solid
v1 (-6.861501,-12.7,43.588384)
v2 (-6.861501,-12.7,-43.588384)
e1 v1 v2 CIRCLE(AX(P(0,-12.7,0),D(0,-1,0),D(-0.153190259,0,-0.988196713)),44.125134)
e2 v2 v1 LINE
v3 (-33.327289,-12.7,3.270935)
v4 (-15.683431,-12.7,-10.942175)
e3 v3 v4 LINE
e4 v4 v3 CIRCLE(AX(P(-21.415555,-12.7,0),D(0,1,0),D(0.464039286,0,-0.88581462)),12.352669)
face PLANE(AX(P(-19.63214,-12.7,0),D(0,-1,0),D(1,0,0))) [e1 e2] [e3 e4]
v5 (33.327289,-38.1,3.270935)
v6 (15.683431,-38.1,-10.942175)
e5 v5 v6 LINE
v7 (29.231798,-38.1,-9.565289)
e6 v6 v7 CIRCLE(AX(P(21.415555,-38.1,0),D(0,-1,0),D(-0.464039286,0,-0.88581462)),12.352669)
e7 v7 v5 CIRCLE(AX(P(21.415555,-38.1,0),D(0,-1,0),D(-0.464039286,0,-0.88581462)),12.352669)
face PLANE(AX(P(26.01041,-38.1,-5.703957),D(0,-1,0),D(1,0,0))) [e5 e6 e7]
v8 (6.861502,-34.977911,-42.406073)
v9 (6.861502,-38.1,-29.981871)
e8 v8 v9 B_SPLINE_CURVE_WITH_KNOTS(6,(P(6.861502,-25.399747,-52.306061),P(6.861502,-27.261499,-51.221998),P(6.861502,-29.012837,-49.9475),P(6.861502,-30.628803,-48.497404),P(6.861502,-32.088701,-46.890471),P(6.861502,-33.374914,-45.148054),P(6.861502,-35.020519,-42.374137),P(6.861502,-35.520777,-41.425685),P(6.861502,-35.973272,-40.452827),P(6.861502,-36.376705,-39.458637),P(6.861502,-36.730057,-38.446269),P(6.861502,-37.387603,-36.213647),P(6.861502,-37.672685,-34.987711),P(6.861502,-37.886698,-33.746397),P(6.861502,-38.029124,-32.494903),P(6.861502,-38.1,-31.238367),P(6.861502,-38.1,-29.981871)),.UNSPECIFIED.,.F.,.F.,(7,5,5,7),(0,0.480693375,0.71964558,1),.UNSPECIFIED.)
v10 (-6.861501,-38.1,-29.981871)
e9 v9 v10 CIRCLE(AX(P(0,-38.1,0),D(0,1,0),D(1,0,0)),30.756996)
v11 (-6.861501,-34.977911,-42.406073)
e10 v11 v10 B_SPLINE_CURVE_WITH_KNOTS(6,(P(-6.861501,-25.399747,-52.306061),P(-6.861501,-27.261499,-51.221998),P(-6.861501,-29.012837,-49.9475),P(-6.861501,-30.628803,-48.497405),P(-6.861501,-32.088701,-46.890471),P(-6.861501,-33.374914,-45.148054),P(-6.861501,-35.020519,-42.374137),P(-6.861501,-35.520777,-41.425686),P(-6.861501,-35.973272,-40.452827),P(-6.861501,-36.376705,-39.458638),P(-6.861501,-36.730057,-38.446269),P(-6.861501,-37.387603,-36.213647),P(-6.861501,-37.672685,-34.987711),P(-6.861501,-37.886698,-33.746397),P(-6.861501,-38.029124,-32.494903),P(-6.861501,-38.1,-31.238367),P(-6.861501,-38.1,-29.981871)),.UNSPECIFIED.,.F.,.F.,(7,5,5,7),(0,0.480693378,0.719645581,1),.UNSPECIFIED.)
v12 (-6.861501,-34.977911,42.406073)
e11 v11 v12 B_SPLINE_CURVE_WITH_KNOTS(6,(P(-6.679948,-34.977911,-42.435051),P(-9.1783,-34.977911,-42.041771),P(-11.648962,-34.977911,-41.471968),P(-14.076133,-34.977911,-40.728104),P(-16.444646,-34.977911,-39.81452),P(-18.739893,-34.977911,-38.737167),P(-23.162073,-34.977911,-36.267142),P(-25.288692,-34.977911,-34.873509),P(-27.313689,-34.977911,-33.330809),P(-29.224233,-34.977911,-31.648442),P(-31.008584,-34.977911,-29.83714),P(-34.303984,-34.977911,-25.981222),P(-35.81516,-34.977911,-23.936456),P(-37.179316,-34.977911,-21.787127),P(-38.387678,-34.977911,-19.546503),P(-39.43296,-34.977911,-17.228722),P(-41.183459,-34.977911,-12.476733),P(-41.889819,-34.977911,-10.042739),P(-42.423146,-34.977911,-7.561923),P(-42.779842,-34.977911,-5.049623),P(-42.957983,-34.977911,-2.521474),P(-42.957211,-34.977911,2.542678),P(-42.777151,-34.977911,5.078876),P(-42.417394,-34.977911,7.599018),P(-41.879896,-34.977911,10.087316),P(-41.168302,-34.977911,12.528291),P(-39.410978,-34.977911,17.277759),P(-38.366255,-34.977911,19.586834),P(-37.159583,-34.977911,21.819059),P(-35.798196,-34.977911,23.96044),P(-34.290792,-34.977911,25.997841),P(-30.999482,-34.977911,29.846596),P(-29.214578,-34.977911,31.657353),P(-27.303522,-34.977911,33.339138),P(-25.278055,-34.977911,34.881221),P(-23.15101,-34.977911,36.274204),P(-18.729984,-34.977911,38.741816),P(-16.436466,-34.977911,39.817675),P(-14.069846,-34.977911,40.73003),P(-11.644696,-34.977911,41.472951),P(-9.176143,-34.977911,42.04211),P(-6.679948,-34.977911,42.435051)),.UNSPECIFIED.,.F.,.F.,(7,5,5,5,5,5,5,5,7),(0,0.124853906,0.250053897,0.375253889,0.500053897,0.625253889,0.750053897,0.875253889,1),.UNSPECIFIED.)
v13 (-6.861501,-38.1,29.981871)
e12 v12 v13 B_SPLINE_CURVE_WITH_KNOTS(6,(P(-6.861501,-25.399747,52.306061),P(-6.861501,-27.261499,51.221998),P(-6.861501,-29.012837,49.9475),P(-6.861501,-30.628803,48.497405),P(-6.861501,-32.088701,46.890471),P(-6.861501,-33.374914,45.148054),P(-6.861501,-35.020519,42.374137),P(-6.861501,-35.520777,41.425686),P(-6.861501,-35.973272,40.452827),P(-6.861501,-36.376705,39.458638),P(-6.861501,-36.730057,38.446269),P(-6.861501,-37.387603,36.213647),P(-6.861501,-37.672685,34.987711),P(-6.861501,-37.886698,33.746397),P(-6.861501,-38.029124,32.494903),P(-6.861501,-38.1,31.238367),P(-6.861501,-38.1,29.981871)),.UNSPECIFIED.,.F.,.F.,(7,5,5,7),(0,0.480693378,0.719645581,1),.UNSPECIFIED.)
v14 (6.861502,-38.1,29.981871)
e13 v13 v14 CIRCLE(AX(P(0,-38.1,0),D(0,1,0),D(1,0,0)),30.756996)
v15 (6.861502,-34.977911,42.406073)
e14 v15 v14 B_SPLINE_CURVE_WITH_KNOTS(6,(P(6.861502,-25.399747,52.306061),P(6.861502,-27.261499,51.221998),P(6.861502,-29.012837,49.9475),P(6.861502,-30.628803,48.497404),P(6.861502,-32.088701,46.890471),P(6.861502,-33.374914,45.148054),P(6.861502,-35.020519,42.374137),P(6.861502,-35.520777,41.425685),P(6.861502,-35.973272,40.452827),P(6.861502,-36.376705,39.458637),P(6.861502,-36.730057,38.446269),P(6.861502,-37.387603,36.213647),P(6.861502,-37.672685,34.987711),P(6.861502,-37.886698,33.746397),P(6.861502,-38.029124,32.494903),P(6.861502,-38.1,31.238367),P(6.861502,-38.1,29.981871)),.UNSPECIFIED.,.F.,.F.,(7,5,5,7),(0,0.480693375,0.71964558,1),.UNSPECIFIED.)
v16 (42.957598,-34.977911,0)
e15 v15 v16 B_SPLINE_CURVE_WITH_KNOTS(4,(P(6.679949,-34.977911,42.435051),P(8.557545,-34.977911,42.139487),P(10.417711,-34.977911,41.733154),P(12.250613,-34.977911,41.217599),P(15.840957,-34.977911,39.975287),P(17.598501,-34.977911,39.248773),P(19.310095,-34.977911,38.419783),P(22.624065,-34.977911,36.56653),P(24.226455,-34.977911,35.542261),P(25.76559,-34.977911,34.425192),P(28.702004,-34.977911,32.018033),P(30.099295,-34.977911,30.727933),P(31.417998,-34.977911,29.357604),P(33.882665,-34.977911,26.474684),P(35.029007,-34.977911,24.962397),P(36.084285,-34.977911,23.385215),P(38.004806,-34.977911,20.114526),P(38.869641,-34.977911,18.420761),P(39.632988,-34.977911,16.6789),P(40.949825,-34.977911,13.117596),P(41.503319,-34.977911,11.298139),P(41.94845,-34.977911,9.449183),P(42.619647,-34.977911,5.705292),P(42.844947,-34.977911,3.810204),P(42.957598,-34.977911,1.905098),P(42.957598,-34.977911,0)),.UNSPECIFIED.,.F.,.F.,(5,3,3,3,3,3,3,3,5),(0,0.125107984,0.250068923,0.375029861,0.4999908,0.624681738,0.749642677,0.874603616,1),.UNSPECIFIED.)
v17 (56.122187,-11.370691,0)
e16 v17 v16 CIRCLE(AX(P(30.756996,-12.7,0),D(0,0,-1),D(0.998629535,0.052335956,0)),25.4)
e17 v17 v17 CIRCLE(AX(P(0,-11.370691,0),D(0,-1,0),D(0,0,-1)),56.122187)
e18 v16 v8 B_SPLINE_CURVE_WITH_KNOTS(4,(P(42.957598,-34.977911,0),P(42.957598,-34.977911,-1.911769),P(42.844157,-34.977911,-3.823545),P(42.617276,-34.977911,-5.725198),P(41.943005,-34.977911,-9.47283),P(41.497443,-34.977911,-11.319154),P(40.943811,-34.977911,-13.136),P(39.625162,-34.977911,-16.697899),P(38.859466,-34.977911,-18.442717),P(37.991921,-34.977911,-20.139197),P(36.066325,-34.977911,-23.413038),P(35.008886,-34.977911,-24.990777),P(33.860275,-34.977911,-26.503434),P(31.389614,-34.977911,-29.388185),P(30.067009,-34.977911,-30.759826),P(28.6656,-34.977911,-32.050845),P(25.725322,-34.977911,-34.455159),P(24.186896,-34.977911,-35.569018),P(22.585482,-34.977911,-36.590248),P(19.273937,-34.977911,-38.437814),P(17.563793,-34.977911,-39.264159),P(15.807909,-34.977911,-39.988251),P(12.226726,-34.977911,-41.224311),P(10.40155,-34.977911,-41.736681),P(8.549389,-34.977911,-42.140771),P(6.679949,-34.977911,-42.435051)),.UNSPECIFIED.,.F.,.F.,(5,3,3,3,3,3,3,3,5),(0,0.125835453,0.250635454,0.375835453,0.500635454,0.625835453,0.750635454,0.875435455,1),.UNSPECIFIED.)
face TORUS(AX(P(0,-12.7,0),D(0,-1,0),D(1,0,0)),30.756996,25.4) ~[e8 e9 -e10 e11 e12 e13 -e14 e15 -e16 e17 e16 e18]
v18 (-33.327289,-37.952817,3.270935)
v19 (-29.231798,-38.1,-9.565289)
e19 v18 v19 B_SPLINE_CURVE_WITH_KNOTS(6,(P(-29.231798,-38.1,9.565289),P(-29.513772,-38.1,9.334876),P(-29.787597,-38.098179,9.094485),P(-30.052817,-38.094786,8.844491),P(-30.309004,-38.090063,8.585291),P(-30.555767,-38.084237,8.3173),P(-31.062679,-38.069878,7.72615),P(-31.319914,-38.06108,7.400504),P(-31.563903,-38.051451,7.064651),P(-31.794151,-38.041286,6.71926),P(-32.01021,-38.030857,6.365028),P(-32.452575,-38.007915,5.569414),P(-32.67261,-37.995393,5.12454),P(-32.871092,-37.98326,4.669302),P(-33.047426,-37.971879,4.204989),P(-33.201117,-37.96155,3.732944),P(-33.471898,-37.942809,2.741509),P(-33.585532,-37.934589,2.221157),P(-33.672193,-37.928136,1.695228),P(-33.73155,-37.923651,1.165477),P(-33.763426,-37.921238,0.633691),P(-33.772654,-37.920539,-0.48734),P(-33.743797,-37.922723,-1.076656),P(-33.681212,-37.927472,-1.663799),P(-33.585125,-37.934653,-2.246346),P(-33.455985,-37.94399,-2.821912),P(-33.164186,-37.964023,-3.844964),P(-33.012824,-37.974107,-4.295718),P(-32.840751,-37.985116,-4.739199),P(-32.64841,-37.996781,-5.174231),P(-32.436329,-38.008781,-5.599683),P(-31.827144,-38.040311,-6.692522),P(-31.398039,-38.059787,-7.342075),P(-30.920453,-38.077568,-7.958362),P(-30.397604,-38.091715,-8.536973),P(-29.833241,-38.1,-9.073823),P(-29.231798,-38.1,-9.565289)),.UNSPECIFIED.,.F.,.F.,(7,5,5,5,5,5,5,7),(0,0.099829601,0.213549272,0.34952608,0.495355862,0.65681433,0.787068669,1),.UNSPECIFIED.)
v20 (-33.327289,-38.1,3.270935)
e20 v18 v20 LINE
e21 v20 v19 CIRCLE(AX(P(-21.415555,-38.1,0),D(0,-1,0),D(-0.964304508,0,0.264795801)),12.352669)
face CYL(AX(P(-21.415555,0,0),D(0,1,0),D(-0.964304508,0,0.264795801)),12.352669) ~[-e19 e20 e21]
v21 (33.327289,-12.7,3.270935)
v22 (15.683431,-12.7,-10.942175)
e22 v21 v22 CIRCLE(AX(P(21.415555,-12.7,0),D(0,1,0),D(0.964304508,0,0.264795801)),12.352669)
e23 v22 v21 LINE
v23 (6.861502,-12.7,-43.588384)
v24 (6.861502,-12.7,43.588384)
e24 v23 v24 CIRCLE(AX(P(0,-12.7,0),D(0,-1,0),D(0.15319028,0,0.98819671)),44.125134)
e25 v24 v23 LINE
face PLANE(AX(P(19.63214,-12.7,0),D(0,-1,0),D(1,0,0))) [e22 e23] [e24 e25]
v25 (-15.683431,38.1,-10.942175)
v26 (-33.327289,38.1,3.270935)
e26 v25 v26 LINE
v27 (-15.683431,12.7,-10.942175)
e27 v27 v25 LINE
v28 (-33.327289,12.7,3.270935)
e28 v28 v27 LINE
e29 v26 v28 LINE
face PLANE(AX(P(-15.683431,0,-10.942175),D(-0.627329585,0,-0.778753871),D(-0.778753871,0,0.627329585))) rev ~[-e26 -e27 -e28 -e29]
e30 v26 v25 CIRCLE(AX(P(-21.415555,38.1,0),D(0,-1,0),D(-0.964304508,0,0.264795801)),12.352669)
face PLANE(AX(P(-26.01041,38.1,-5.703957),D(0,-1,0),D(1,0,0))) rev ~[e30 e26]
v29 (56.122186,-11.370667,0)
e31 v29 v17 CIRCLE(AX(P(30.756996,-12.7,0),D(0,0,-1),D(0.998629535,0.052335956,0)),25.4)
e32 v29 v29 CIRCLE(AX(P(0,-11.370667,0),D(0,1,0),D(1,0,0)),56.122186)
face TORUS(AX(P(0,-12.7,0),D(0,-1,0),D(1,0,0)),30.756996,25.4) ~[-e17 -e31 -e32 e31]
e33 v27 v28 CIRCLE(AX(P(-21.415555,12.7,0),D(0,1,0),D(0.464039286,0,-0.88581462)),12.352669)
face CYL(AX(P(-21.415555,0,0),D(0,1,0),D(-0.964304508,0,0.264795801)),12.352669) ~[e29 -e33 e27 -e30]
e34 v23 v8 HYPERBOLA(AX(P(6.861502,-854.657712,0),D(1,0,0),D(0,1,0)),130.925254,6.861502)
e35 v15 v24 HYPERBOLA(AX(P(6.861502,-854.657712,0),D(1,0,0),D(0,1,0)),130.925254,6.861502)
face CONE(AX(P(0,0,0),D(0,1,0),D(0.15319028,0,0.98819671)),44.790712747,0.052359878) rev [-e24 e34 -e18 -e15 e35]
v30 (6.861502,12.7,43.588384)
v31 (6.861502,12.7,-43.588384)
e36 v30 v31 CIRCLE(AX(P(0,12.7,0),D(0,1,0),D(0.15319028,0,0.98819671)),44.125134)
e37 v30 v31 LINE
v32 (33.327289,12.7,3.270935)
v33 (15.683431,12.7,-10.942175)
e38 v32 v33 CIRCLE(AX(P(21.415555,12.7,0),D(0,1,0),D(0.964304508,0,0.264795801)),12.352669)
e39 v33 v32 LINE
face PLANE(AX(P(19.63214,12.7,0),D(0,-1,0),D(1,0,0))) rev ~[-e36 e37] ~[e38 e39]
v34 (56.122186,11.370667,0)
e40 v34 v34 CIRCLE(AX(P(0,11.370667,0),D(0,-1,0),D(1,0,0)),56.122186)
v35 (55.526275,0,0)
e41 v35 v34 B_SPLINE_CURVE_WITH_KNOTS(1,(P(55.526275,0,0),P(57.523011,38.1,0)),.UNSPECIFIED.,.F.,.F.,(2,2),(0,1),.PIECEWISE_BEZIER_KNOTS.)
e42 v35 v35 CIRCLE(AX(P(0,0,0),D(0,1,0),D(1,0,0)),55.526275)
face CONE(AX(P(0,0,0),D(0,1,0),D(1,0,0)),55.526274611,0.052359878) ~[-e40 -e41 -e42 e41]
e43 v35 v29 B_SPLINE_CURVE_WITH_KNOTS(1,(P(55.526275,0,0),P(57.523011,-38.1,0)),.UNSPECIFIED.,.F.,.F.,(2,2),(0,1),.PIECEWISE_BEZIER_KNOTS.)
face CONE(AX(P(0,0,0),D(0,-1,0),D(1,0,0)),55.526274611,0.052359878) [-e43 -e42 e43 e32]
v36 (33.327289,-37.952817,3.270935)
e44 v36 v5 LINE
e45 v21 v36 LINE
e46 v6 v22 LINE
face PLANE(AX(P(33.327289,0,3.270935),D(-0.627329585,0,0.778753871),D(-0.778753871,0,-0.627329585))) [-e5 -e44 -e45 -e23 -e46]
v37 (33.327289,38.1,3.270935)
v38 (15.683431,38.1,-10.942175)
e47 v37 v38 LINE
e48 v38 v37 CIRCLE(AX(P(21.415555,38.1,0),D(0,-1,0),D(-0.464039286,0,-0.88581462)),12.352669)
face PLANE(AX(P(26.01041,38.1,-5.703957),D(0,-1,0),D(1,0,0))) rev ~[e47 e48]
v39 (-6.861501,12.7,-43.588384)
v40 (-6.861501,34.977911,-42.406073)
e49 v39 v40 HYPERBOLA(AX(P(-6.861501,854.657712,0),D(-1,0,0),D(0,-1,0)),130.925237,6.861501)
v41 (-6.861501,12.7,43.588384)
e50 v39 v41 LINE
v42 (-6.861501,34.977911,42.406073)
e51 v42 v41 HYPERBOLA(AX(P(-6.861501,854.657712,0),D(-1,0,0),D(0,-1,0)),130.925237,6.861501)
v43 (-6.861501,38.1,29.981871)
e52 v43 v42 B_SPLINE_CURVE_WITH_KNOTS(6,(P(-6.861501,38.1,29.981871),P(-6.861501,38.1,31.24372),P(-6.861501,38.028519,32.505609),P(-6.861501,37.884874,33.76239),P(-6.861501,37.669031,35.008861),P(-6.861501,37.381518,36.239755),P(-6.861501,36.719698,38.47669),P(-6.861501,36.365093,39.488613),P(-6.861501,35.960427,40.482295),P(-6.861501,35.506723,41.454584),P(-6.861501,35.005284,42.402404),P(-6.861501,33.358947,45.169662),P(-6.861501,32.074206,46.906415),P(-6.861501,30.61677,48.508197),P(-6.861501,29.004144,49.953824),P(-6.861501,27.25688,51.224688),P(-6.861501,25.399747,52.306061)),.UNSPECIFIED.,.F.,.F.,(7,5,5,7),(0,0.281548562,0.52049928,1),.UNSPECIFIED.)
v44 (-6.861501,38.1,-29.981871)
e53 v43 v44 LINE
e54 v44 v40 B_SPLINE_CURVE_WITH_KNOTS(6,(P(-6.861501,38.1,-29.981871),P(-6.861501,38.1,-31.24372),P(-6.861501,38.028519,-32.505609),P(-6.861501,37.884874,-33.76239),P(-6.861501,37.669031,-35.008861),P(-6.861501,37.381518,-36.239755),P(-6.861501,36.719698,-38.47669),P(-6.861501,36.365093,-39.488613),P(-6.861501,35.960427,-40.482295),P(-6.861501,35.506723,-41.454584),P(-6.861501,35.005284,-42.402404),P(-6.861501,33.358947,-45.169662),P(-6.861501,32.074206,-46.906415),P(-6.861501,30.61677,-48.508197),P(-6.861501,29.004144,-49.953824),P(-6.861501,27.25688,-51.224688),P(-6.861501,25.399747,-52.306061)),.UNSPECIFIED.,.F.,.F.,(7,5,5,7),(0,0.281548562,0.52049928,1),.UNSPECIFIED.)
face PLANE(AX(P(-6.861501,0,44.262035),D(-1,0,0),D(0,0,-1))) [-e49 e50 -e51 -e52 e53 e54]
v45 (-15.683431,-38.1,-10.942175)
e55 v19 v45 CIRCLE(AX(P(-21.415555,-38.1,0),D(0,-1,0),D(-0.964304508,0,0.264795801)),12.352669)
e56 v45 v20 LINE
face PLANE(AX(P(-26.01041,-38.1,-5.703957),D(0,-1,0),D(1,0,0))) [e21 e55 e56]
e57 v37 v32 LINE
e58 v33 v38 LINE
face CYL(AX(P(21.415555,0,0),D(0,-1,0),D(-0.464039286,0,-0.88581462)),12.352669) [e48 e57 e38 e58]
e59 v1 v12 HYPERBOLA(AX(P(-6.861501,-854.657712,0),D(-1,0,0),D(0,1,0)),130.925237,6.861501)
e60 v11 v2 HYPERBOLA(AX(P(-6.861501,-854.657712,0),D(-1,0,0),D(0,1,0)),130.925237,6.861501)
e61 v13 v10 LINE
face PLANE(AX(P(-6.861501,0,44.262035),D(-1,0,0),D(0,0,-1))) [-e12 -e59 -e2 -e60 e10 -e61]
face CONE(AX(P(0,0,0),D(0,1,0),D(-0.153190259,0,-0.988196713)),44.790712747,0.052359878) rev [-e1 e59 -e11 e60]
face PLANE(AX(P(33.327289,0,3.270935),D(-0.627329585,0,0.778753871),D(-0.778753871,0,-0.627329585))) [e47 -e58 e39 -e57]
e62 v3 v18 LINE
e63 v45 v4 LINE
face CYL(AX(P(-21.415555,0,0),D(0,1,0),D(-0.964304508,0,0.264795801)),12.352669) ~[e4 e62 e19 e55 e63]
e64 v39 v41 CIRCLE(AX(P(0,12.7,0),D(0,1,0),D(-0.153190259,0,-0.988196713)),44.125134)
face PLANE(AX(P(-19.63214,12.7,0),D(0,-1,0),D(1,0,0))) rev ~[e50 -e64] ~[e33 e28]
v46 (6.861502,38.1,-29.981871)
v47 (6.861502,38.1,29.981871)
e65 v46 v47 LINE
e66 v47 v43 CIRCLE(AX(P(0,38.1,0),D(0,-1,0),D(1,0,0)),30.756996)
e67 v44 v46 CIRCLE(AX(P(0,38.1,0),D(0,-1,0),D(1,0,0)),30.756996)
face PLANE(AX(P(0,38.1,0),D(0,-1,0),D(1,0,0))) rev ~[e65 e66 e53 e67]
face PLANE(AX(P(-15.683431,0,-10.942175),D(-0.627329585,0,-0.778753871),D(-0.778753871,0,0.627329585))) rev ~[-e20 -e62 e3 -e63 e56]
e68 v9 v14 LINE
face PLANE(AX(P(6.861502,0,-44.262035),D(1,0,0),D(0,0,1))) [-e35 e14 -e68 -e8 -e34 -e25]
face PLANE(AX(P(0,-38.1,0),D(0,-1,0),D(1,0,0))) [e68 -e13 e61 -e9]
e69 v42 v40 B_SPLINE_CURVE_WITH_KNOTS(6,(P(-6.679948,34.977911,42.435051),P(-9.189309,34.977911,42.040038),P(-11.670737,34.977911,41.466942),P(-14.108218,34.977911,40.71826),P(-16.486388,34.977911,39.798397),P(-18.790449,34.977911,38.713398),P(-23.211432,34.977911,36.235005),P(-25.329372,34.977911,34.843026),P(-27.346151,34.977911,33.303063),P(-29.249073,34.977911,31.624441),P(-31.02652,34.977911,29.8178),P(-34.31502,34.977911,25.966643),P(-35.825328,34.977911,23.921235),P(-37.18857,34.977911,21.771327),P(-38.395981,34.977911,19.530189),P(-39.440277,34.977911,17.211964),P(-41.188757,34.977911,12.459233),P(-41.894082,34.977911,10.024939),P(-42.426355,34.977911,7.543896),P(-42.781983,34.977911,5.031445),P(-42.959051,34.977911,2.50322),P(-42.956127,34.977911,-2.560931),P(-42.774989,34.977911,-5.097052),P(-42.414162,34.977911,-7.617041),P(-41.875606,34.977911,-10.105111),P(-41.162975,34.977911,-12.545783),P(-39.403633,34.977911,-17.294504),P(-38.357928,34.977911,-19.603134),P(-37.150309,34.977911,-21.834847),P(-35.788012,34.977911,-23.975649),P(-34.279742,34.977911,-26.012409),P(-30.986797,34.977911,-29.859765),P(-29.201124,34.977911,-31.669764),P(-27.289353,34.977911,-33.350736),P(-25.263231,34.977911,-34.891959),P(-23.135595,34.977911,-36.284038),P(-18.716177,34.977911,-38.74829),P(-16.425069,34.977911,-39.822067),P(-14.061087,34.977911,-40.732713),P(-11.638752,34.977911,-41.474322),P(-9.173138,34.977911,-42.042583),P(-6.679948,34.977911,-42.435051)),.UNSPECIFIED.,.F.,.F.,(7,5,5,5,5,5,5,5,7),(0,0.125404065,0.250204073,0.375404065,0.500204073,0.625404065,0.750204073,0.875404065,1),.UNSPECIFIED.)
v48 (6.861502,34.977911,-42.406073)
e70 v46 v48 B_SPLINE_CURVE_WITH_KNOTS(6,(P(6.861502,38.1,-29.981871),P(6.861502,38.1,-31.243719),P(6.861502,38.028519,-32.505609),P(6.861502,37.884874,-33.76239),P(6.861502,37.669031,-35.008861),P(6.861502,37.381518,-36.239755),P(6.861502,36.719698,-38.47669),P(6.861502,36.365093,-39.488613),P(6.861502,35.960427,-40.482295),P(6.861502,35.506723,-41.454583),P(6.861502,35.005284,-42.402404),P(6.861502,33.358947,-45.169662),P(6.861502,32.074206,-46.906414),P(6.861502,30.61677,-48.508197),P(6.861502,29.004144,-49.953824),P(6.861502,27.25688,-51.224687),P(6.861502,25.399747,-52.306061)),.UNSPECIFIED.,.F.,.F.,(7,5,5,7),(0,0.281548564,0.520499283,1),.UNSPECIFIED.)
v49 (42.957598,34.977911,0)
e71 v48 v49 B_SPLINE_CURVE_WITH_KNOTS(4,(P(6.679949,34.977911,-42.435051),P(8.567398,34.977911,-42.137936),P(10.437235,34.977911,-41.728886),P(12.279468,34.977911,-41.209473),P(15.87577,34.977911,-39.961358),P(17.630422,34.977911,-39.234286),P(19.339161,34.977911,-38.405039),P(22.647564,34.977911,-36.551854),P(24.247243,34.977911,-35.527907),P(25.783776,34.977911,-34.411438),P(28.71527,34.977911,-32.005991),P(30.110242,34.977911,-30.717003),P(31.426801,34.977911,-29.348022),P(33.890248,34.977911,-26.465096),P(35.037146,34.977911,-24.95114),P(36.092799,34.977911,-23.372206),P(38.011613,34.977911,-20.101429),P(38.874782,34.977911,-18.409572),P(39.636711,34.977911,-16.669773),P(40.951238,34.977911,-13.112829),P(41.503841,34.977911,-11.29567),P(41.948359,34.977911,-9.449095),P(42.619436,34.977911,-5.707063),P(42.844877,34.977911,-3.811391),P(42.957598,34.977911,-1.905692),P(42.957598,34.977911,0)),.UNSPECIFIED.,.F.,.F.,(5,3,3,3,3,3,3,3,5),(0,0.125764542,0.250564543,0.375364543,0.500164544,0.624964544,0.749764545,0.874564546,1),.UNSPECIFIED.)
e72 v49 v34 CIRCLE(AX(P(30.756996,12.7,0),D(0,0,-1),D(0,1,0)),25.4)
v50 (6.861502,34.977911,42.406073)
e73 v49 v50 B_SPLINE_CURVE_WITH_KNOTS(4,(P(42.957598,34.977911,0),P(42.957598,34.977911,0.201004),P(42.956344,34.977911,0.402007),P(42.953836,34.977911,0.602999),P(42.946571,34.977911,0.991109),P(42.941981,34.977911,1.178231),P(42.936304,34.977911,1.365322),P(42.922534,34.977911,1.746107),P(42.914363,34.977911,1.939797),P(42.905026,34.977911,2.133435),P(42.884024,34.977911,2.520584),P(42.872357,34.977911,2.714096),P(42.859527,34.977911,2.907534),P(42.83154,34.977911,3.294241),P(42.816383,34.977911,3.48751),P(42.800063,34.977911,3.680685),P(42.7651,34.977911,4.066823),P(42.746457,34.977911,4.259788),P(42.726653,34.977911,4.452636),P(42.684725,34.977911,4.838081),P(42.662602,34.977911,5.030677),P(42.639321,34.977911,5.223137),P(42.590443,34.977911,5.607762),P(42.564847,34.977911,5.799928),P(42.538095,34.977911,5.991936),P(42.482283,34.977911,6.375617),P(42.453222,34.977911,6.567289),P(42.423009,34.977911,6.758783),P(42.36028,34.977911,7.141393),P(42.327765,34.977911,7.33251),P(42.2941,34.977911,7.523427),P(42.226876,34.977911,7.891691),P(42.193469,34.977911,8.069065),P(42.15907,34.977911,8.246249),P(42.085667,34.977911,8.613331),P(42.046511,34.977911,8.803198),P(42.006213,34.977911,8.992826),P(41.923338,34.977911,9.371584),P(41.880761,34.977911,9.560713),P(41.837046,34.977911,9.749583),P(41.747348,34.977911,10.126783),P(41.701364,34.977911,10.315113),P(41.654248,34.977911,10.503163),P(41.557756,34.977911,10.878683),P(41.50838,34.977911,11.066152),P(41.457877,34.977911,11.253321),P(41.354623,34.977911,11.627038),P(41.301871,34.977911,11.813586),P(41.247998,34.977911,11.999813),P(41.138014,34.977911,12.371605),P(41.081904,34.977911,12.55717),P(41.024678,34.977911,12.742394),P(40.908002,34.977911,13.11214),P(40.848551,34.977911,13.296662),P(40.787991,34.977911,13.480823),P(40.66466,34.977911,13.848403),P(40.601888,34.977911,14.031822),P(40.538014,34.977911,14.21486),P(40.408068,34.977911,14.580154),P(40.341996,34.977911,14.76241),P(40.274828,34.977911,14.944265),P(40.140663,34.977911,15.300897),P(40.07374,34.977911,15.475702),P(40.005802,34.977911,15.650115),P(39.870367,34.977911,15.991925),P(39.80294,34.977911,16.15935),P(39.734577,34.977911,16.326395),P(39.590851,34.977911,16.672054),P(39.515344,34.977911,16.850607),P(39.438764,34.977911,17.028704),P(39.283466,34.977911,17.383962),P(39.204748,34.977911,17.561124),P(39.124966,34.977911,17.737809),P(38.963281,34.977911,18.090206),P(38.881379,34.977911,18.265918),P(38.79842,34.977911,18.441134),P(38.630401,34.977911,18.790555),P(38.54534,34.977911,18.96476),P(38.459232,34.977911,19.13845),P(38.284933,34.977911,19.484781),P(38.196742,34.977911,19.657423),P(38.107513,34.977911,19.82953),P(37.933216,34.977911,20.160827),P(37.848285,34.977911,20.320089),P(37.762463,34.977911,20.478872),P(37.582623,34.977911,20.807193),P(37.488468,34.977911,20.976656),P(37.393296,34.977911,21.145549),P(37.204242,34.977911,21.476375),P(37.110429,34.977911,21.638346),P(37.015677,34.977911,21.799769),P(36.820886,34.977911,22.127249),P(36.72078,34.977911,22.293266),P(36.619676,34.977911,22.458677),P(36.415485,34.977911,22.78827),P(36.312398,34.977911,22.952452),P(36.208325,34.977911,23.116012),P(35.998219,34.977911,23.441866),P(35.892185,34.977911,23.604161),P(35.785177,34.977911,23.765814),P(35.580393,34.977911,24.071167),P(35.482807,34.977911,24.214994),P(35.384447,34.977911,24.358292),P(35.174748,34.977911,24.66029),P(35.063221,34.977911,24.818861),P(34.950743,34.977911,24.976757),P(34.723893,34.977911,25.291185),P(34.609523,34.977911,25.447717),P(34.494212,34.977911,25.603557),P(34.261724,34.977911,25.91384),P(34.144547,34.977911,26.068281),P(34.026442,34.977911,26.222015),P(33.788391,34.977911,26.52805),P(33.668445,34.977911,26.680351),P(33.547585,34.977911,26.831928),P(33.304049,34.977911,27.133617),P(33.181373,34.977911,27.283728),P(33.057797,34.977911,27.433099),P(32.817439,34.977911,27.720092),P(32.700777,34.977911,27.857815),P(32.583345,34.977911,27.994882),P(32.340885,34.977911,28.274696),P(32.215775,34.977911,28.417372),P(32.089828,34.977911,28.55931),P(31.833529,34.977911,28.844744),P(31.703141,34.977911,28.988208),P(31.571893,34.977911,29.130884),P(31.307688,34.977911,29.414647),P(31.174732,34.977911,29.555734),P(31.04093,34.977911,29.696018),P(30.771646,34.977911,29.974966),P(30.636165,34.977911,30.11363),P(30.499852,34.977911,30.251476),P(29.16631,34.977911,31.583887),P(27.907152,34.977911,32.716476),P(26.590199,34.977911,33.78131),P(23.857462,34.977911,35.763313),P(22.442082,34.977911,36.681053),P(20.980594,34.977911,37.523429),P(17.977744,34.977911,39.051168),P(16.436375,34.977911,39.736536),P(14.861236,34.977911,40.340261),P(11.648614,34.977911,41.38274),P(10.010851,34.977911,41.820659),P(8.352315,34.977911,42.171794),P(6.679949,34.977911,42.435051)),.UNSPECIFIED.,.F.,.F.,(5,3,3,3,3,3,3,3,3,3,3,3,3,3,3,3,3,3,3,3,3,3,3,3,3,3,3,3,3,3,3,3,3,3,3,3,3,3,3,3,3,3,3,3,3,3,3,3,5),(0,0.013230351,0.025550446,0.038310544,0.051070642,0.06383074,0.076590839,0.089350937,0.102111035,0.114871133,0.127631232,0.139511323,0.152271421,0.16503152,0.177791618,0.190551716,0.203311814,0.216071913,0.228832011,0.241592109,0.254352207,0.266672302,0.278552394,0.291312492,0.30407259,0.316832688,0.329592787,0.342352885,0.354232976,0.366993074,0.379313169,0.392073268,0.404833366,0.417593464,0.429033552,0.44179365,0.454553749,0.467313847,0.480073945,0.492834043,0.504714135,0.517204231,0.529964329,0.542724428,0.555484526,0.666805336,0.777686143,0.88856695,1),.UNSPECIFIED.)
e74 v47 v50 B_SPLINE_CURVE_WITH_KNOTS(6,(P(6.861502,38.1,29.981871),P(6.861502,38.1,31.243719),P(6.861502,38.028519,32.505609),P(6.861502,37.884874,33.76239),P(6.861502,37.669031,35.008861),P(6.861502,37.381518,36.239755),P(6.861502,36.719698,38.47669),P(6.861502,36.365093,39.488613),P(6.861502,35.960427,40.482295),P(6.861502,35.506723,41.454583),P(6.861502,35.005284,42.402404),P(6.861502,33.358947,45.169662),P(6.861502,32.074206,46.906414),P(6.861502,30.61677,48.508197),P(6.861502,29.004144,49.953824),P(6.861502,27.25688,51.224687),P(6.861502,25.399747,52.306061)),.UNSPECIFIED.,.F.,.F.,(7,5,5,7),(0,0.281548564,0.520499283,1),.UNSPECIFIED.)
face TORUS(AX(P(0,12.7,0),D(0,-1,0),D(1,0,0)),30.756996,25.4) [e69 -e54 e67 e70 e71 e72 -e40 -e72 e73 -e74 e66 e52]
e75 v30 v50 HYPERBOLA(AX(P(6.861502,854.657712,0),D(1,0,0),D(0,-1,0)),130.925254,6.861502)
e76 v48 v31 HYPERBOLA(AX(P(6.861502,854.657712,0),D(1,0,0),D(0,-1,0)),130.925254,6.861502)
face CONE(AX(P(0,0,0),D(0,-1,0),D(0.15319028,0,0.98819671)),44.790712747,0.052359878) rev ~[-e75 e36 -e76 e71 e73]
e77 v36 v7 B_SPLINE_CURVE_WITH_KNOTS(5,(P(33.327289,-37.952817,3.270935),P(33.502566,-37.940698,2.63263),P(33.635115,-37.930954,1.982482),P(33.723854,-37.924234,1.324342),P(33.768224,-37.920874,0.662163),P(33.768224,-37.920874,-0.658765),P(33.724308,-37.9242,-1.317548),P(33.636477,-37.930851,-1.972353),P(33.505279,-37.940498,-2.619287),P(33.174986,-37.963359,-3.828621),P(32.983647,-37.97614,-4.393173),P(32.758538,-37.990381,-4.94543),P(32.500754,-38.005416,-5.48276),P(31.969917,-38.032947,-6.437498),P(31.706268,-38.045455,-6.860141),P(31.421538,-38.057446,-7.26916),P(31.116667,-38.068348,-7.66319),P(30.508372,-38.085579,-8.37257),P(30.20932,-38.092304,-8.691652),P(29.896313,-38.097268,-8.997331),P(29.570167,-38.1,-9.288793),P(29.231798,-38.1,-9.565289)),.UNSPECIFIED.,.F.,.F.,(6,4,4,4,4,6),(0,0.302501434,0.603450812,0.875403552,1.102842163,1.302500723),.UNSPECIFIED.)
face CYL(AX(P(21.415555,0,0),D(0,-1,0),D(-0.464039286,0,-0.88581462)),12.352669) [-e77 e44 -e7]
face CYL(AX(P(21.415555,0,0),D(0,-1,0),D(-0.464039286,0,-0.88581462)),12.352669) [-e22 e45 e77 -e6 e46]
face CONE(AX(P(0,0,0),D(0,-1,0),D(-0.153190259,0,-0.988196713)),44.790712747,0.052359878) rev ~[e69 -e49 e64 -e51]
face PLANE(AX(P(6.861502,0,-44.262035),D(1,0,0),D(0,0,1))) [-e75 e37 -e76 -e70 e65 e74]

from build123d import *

# Parameters (mm, degrees)
F0_R         = 55.5262746105
F1_DEPTH     = 38.1
F1_TAPER     = -3
F2_DEPTH     = 38.1
F3_DEPTH     = 12.7
F4_DEPTH     = 38.1
F5_S5_R      = 12.3526687507
F5_T6_DEPTH  = 90
F5_S7_R      = 12.3526687507
F5_T8_DEPTH  = 90
F5_S13_R     = 12.3526687507
F5_T14_DEPTH = 90
F5_S15_R     = 12.3526687507
F5_T16_DEPTH = 90


# Not quite as in the source:
# - a fillet or chamfer that OpenCascade refuses, or shapes differently, is made with other operations: its cross-section is extruded or revolved along the edge and cut away or added
# - two fillets or chamfers of one size are made in one step


with BuildPart() as f1:
    # F0 (on Front) → F1 (new body, symmetric)
    with BuildSketch(Plane.XZ):
        Circle(F0_R)
        with BuildLine():
            ThreePointArc((6.861501839, 44.2620349836), (34.0113180152, 29.1451230097), (44.790712747, 0))
            ThreePointArc((44.790712747, 0), (34.0113180152, -29.1451230097), (6.861501839, -44.2620349836))
            Line((6.861501839, -44.2620349836), (6.861501839, -46.4376546443))
            Line((6.861501839, -46.4376546443), (-6.8615009077, -46.4376546443))
            Line((-6.8615009077, -46.4376546443), (-6.8615009077, -44.262035128))
            ThreePointArc((-6.8615009077, -44.262035128), (-44.790712747, 0), (-6.8615009077, 44.262035128))
            Line((-6.8615009077, 44.262035128), (-6.8615009077, 48.6431419849))
            Line((-6.8615009077, 48.6431419849), (6.861501839, 48.6431419849))
            Line((6.861501839, 48.6431419849), (6.861501839, 44.2620349836))
        make_face(mode=Mode.SUBTRACT)
        with BuildLine():
            ThreePointArc((-6.8615009077, 44.262035128), (4.712e-07, 44.790712747), (6.861501839, 44.2620349836))
            Line((6.861501839, 44.2620349836), (6.861501839, 48.6431419849))
            Line((6.861501839, 48.6431419849), (-6.8615009077, 48.6431419849))
            Line((-6.8615009077, 48.6431419849), (-6.8615009077, 44.262035128))
        make_face()
        with BuildLine():
            Line((6.861501839, -46.4376546443), (6.861501839, -44.2620349836))
            ThreePointArc((6.861501839, -44.2620349836), (4.712e-07, -44.790712747), (-6.8615009077, -44.262035128))
            Line((-6.8615009077, -44.262035128), (-6.8615009077, -46.4376546443))
            Line((-6.8615009077, -46.4376546443), (6.861501839, -46.4376546443))
        make_face()
    extrude(amount=F1_DEPTH, both=True, taper=F1_TAPER)

    # F0 (on Front) → F2 (join, symmetric)
    with BuildSketch(Plane.XZ):
        with BuildLine():
            Line((6.861501839, -44.2620349836), (6.861501839, 44.2620349836))
            ThreePointArc((6.861501839, 44.2620349836), (4.712e-07, 44.790712747), (-6.8615009077, 44.262035128))
            Line((-6.8615009077, 44.262035128), (-6.8615009077, -44.262035128))
            ThreePointArc((-6.8615009077, -44.262035128), (4.712e-07, -44.790712747), (6.861501839, -44.2620349836))
        make_face()
    extrude(amount=F2_DEPTH, both=True)

    # F0 (on Front) → F3 (join, symmetric)
    with BuildSketch(Plane.XZ):
        with BuildLine():
            Line((-6.8615009077, -44.262035128), (-6.8615009077, 44.262035128))
            ThreePointArc((-6.8615009077, 44.262035128), (-44.790712747, 0), (-6.8615009077, -44.262035128))
        make_face()
        with BuildLine():
            ThreePointArc((-15.6834311783, -10.942174576), (-29.1647493256, -9.6196886086), (-33.3272889256, 3.270934813))
            Line((-33.3272889256, 3.270934813), (-15.6834311783, -10.942174576))
        make_face(mode=Mode.SUBTRACT)
        with BuildLine():
            ThreePointArc((6.861501839, -44.2620349836), (34.0113180152, -29.1451230097), (44.790712747, 0))
            ThreePointArc((44.790712747, 0), (34.0113180152, 29.1451230097), (6.861501839, 44.2620349836))
            Line((6.861501839, 44.2620349836), (6.861501839, -44.2620349836))
        make_face()
        with BuildLine():
            Line((15.6834311783, -10.942174576), (33.3272889256, 3.270934813))
            ThreePointArc((33.3272889256, 3.270934813), (29.1647493256, -9.6196886086), (15.6834311783, -10.942174576))
        make_face(mode=Mode.SUBTRACT)
    extrude(amount=F3_DEPTH, both=True)

    # F0 (on Front) → F4 (join, symmetric)
    with BuildSketch(Plane.XZ):
        with BuildLine():
            Line((-15.6834311783, -10.942174576), (-33.3272889256, 3.270934813))
            ThreePointArc((-33.3272889256, 3.270934813), (-29.1647493256, -9.6196886086), (-15.6834311783, -10.942174576))
        make_face()
        with BuildLine():
            ThreePointArc((15.6834311783, -10.942174576), (29.1647493256, -9.6196886086), (33.3272889256, 3.270934813))
            Line((33.3272889256, 3.270934813), (15.6834311783, -10.942174576))
        make_face()
    extrude(amount=F4_DEPTH, both=True)

    # F5: fillet of radius 25.4 on 2 edges, made by hand


with BuildPart() as f5_tool2:
    # F5_s3 → F5_t4 (revolve)
    with BuildSketch(Plane.XY):
        with BuildLine():
            ThreePointArc((30.7569958191, 38.1), (49.1815048428, 30.1842062226), (56.1221860018, 11.3706667114))
            Line((56.1221860018, 11.3706667114), (57.5230110012, 38.1))
            Line((57.5230110012, 38.1), (30.7569958191, 38.1))
        make_face()
    revolve(axis=Axis((0, 38.1, 0), (0, -1, 0)))

    # F5_s5 → F5_t6 (cut, symmetric)
    with BuildSketch(Plane.XZ.offset(-16.4)):
        with Locations((-21.415554765, 0)):
            Circle(F5_S5_R)
    extrude(amount=F5_T6_DEPTH, both=True, mode=Mode.SUBTRACT)

    # F5_s7 → F5_t8 (cut, symmetric)
    with BuildSketch(Plane.XZ.offset(-16.4)):
        with Locations((21.415554765, 0)):
            Circle(F5_S7_R)
    extrude(amount=F5_T8_DEPTH, both=True, mode=Mode.SUBTRACT)


with BuildPart() as f1_1:
    add(f1.part)

    # F5_t1: cut F5_tool2
    add(f5_tool2.part, mode=Mode.SUBTRACT)


with BuildPart() as f5_tool10:
    # F5_s11 → F5_t12 (revolve)
    with BuildSketch(Plane.XY):
        with BuildLine():
            ThreePointArc((56.1221860018, -11.3706667114), (49.1815048428, -30.1842062226), (30.7569958191, -38.1))
            Line((30.7569958191, -38.1), (57.5230110012, -38.1))
            Line((57.5230110012, -38.1), (56.1221860018, -11.3706667114))
        make_face()
    revolve(axis=Axis((0, -38.1, 0), (0, 1, 0)))

    # F5_s13 → F5_t14 (cut, symmetric)
    with BuildSketch(Plane.XZ.offset(16.4)):
        with Locations((21.415554765, 0)):
            Circle(F5_S13_R)
    extrude(amount=F5_T14_DEPTH, both=True, mode=Mode.SUBTRACT)

    # F5_s15 → F5_t16 (cut, symmetric)
    with BuildSketch(Plane.XZ.offset(16.4)):
        with Locations((-21.415554765, 0)):
            Circle(F5_S15_R)
    extrude(amount=F5_T16_DEPTH, both=True, mode=Mode.SUBTRACT)


with BuildPart() as f1_2:
    add(f1_1.part)

    # F5_t9: cut F5_tool10
    add(f5_tool10.part, mode=Mode.SUBTRACT)


solid = f1_2.part
